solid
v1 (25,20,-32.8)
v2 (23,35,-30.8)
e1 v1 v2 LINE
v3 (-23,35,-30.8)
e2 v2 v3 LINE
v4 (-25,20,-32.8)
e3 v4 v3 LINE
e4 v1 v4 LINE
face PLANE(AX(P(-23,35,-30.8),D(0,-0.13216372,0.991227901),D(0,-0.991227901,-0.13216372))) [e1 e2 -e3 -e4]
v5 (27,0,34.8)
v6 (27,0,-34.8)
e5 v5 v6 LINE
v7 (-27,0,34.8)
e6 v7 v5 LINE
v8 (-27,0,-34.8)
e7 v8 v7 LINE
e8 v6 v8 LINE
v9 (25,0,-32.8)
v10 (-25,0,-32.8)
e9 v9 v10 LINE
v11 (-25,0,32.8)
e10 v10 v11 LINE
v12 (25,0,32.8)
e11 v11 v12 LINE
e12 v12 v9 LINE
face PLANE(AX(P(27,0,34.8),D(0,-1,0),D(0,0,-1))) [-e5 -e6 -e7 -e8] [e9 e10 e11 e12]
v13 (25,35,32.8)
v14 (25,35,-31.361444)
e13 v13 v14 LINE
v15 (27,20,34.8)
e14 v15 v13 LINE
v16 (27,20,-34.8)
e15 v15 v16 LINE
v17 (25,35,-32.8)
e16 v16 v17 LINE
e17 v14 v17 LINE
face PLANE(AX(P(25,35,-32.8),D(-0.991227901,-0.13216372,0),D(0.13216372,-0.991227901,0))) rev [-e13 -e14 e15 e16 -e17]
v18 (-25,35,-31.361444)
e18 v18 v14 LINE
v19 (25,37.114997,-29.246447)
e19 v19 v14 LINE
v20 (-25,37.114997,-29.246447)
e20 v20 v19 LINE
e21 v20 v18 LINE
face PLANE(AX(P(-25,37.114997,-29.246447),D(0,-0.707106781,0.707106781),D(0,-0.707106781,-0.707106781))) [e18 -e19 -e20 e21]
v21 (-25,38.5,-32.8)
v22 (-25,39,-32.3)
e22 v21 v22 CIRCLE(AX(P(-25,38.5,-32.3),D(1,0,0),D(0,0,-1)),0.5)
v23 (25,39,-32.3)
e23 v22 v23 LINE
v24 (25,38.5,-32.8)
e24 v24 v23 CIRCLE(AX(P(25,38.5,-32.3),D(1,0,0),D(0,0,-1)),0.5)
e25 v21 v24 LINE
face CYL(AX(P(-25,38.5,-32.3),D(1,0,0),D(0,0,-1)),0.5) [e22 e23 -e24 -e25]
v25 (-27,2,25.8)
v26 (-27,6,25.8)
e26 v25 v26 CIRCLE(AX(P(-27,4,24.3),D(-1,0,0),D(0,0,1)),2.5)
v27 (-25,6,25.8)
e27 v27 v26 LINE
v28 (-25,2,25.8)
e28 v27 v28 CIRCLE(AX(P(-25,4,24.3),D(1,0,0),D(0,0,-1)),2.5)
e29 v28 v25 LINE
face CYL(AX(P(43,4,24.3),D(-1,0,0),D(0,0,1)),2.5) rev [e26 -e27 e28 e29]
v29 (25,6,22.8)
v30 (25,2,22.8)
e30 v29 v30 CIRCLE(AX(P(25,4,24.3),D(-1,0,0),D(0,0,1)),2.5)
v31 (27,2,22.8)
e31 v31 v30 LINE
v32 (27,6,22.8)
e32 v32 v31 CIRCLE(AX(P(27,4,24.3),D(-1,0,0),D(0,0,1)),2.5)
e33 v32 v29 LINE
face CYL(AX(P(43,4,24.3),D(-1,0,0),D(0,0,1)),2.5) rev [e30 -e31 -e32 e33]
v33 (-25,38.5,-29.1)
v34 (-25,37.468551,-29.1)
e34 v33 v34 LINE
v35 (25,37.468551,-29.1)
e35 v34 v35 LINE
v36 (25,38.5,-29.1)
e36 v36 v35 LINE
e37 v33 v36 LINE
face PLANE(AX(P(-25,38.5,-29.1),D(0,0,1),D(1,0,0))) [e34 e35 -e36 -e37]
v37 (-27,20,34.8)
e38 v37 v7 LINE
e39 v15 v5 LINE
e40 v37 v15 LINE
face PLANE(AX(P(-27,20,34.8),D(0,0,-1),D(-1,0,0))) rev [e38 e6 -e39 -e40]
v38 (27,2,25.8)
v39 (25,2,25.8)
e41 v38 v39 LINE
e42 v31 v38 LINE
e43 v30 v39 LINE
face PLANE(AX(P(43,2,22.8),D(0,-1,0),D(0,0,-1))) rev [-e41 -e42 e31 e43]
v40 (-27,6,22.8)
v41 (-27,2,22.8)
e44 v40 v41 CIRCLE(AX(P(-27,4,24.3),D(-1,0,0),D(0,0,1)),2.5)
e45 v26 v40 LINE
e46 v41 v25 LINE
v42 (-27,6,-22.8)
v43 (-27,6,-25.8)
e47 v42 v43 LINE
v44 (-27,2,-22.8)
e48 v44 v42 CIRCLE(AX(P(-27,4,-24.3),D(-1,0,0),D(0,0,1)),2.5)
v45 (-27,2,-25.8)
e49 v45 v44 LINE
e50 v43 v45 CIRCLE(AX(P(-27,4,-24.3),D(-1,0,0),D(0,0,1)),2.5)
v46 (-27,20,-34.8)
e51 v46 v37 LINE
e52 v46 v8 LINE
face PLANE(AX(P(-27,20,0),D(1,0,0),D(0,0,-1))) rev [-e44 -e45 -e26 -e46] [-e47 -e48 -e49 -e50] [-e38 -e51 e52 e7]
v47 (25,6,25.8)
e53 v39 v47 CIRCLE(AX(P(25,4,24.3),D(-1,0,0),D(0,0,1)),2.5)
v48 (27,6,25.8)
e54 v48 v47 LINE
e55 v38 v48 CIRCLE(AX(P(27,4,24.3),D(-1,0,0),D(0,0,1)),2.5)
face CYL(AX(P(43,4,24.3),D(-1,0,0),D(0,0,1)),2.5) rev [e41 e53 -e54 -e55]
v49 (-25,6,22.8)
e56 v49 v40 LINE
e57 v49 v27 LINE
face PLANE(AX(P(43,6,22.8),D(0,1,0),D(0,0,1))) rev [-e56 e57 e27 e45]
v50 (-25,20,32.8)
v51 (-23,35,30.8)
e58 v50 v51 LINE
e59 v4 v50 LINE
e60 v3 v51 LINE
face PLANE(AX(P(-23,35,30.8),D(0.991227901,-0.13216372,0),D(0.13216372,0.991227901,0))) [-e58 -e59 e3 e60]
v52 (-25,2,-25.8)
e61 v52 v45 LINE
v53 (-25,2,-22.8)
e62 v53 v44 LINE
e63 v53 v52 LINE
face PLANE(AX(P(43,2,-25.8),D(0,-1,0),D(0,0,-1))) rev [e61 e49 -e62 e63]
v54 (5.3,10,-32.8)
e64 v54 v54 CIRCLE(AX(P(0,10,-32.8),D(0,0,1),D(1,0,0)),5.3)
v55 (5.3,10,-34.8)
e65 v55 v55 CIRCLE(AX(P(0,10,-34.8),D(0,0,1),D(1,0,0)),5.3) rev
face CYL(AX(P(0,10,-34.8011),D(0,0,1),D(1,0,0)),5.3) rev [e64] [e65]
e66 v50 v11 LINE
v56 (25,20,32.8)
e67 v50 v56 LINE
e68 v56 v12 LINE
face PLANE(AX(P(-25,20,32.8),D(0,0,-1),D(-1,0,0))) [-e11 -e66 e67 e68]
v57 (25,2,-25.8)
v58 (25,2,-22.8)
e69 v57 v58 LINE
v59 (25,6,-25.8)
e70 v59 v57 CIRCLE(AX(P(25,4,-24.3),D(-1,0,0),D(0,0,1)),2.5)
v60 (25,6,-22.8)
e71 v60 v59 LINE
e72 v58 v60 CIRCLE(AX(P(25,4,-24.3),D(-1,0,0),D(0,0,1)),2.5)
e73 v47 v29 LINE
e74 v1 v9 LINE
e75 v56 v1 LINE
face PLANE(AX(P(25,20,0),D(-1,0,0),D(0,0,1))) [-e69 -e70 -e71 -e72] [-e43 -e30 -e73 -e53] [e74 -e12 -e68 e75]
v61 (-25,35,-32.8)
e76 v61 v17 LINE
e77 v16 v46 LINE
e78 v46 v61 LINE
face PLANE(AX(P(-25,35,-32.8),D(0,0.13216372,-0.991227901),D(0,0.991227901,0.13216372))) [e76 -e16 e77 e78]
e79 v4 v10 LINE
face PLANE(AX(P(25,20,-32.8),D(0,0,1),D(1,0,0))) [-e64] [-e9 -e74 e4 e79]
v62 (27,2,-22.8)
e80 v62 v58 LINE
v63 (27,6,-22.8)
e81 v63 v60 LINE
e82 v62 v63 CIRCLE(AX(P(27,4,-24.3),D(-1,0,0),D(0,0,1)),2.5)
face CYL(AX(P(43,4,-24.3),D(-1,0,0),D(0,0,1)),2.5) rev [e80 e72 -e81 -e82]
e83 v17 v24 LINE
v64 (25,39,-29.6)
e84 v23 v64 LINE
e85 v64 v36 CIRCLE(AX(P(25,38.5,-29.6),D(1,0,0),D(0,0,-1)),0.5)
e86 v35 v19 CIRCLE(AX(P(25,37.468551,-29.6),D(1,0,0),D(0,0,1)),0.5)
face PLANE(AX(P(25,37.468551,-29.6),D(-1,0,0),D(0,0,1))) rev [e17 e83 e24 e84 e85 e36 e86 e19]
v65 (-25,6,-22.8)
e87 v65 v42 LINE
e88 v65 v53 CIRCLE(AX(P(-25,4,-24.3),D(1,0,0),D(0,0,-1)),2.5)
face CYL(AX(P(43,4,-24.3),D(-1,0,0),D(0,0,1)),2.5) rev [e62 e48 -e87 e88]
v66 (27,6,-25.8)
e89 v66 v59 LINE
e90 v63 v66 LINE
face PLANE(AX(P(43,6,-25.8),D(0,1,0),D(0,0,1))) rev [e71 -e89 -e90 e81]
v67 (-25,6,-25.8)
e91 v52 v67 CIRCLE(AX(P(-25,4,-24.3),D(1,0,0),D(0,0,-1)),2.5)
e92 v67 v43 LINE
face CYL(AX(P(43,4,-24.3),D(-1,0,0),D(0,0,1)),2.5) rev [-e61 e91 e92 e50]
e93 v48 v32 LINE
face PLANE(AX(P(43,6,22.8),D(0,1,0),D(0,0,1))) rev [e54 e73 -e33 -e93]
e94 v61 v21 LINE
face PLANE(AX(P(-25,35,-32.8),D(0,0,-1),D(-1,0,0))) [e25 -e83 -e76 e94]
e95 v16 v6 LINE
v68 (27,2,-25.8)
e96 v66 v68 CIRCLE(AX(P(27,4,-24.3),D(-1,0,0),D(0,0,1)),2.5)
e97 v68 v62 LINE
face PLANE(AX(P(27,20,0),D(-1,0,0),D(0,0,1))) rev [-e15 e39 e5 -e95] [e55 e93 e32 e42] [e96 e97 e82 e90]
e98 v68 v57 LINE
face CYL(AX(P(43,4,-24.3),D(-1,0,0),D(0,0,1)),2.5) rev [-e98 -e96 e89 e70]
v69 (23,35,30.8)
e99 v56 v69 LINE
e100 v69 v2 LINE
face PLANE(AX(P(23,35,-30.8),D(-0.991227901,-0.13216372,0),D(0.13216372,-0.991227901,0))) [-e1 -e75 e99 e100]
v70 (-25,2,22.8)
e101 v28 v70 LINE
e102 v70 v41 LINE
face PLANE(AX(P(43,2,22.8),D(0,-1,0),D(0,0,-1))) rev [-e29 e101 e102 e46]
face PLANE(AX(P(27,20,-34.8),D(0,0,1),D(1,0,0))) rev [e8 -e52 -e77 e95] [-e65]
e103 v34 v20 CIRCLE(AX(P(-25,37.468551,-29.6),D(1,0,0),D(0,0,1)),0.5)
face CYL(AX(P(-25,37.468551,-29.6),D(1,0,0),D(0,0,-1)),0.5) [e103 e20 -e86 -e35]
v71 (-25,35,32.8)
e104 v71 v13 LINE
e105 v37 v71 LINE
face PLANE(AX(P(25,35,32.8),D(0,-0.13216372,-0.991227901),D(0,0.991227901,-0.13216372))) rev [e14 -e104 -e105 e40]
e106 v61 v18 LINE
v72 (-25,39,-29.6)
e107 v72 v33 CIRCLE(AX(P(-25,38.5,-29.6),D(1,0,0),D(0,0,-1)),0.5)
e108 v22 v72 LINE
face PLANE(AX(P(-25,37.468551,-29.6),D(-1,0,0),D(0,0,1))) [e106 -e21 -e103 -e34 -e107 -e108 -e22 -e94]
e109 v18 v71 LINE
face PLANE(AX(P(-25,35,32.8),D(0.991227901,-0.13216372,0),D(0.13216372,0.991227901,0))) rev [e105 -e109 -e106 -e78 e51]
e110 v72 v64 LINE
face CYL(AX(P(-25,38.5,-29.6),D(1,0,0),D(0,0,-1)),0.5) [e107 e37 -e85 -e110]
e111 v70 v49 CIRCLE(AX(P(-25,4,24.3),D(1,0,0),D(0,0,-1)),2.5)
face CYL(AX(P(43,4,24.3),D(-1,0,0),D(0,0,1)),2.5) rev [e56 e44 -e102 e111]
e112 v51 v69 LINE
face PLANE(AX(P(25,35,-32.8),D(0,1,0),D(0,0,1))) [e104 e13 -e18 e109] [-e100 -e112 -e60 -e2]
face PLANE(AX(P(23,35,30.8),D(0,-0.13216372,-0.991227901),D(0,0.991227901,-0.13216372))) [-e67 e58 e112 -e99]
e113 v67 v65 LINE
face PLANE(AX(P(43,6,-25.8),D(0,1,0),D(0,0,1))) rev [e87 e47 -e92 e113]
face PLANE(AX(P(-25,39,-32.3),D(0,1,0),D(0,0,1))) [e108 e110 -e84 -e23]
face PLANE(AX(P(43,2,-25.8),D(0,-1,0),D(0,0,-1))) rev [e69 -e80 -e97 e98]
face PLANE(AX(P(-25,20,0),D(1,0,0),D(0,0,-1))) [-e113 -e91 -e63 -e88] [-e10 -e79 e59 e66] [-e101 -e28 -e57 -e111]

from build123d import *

# Parameters (mm, degrees)
BOSS_EXTRUDE1_DEPTH = 20
LOFT1_START         = -34.8
LOFT1_DEPTH         = 69.6
LOFT1_START_2       = -28
LOFT1_2_DEPTH       = 56
BOSS_EXTRUDE2_START = -2
BOSS_EXTRUDE2_DEPTH = 50
BOSS_EXTRUDE3_DEPTH = 2.3
BOSS_EXTRUDE4_DEPTH = 2.3
CUT_EXTRUDE1_START  = -69.6
SKETCH7_R           = 5.3
CUT_EXTRUDE1_DEPTH  = 2
CUT_EXTRUDE2_DEPTH  = 70


with BuildPart() as part:
    # Sketch1 → Boss-Extrude1 (new body)
    with BuildSketch(Plane(origin=(0, 0, 0), x_dir=(1, 0, 0), z_dir=(0, 1, 0))):
        Polygon((27, 34.8), (-27, 34.8), (-27, 0), (-27, -34.8), (27, -34.8), (27, 0), align=None)
        Polygon((25, 0), (25, 32.8), (-25, 32.8), (-25, 0), (-25, -32.8), (25, -32.8), align=None, mode=Mode.SUBTRACT)
    extrude(amount=BOSS_EXTRUDE1_DEPTH)

    # Loft1: read off the stored shape, not the designer's step
    # Loft1 outline → Loft1 (add)
    with BuildSketch(Plane.XY.offset(LOFT1_START)):
        Polygon((-27, 20), (27, 20), (25, 35), (-25, 35), align=None)
    extrude(amount=LOFT1_DEPTH)

    # Loft1 2 outline → Loft1 2 (cut)
    with BuildSketch(Plane.YZ.offset(LOFT1_START_2)):
        Polygon((20, 34.8), (35, 32.8), (35, 34.8), align=None)
        Polygon((35, -32.8), (20, -34.8), (35, -34.8), align=None)
    extrude(amount=LOFT1_2_DEPTH, mode=Mode.SUBTRACT)

    # Cut-Loft1: read off the stored shape, not the designer's step
    # Cut-Loft1: loft between two sections, ruled curve by curve
    cut_loft1_from = [
        Edge.make_line((-25, 20, 32.8), (-25, 20, -32.8)),
        Edge.make_line((-25, 20, -32.8), (25, 20, -32.8)),
        Edge.make_line((25, 20, 32.8), (-25, 20, 32.8)),
        Edge.make_line((25, 20, -32.8), (25, 20, 32.8)),
    ]
    cut_loft1_to = [
        Edge.make_line((-23, 35, 30.8), (-23, 35, -30.8)),
        Edge.make_line((-23, 35, -30.8), (23, 35, -30.8)),
        Edge.make_line((23, 35, 30.8), (-23, 35, 30.8)),
        Edge.make_line((23, 35, -30.8), (23, 35, 30.8)),
    ]
    cut_loft1 = Solid(Shell([*[Face.make_surface_from_curves(cut_loft1_from[k], cut_loft1_to[k]) for k in range(4)], Face(Wire(cut_loft1_from)), Face(Wire(cut_loft1_to))]))
    add(cut_loft1, mode=Mode.SUBTRACT)

    # Sketch2 → Boss-Extrude2 (add)
    with BuildSketch(Plane(origin=(27, 0, 0), x_dir=(0, 0, -1), z_dir=(1, 0, 0)).offset(BOSS_EXTRUDE2_START)):
        with BuildLine():
            Line((32.8, 35), (32.8, 38.5))
            ThreePointArc((32.8, 38.5), (32.653553391, 38.853553391), (32.3, 39))
            Line((32.3, 39), (29.6, 39))
            ThreePointArc((29.6, 39), (29.246446609, 38.853553391), (29.1, 38.5))
            Line((29.1, 38.5), (29.1, 37.468550682))
            ThreePointArc((29.1, 37.468550682), (29.138060234, 37.277208966), (29.246446609, 37.114997291))
            Line((29.246446609, 37.114997291), (31.361443901, 35))
            Line((31.361443901, 35), (32.8, 35))
        make_face()
    extrude(amount=-BOSS_EXTRUDE2_DEPTH)

    # Sketch7 → Cut-Extrude1 (cut)
    with BuildSketch(Plane.XY.offset(34.8).offset(CUT_EXTRUDE1_START)):
        with Locations((0, 10)):
            Circle(SKETCH7_R)
    extrude(amount=CUT_EXTRUDE1_DEPTH, mode=Mode.SUBTRACT)

    # Sketch8 → Cut-Extrude2 (cut)
    with BuildSketch(Plane.ZY.offset(27)):
        with BuildLine():
            Line((-25.8, 6), (-22.8, 6))
            ThreePointArc((-22.8, 6), (-21.8, 4), (-22.8, 2))
            Line((-22.8, 2), (-25.8, 2))
            ThreePointArc((-25.8, 2), (-26.8, 4), (-25.8, 6))
        make_face()
        with BuildLine():
            Line((22.8, 6), (25.8, 6))
            ThreePointArc((25.8, 6), (26.8, 4), (25.8, 2))
            Line((25.8, 2), (22.8, 2))
            ThreePointArc((22.8, 2), (21.8, 4), (22.8, 6))
        make_face()
    extrude(amount=-CUT_EXTRUDE2_DEPTH, mode=Mode.SUBTRACT)


with BuildPart() as body_2:
    # Sketch5 → Boss-Extrude3 (new body)
    with BuildSketch(Plane.XZ):
        with BuildLine():
            Line((-25, -34.8), (-25, -9.8))
            ThreePointArc((-25, -9.8), (0, 15.2), (25, -9.8))
            Line((25, -9.8), (25, -34.8))
            Line((25, -34.8), (27, -34.8))
            Line((27, -34.8), (27, 34.8))
            Line((27, 34.8), (-27, 34.8))
            Line((-27, 34.8), (-27, -34.8))
            Line((-27, -34.8), (-25, -34.8))
        make_face()
    extrude(amount=BOSS_EXTRUDE3_DEPTH)

    # Sketch6 → Boss-Extrude4 (add)
    with BuildSketch(Plane.XZ.offset(2.3)):
        with BuildLine():
            Line((22.7, -34.8), (27, -34.8))
            Line((27, -34.8), (27, 34.8))
            Line((27, 34.8), (-27, 34.8))
            Line((-27, 34.8), (-27, -34.8))
            Line((-27, -34.8), (-22.7, -34.8))
            Line((-22.7, -34.8), (-22.7, -9.8))
            ThreePointArc((-22.7, -9.8), (0, 12.9), (22.7, -9.8))
            Line((22.7, -9.8), (22.7, -34.8))
        make_face()
    extrude(amount=BOSS_EXTRUDE4_DEPTH)


solid = part.part
